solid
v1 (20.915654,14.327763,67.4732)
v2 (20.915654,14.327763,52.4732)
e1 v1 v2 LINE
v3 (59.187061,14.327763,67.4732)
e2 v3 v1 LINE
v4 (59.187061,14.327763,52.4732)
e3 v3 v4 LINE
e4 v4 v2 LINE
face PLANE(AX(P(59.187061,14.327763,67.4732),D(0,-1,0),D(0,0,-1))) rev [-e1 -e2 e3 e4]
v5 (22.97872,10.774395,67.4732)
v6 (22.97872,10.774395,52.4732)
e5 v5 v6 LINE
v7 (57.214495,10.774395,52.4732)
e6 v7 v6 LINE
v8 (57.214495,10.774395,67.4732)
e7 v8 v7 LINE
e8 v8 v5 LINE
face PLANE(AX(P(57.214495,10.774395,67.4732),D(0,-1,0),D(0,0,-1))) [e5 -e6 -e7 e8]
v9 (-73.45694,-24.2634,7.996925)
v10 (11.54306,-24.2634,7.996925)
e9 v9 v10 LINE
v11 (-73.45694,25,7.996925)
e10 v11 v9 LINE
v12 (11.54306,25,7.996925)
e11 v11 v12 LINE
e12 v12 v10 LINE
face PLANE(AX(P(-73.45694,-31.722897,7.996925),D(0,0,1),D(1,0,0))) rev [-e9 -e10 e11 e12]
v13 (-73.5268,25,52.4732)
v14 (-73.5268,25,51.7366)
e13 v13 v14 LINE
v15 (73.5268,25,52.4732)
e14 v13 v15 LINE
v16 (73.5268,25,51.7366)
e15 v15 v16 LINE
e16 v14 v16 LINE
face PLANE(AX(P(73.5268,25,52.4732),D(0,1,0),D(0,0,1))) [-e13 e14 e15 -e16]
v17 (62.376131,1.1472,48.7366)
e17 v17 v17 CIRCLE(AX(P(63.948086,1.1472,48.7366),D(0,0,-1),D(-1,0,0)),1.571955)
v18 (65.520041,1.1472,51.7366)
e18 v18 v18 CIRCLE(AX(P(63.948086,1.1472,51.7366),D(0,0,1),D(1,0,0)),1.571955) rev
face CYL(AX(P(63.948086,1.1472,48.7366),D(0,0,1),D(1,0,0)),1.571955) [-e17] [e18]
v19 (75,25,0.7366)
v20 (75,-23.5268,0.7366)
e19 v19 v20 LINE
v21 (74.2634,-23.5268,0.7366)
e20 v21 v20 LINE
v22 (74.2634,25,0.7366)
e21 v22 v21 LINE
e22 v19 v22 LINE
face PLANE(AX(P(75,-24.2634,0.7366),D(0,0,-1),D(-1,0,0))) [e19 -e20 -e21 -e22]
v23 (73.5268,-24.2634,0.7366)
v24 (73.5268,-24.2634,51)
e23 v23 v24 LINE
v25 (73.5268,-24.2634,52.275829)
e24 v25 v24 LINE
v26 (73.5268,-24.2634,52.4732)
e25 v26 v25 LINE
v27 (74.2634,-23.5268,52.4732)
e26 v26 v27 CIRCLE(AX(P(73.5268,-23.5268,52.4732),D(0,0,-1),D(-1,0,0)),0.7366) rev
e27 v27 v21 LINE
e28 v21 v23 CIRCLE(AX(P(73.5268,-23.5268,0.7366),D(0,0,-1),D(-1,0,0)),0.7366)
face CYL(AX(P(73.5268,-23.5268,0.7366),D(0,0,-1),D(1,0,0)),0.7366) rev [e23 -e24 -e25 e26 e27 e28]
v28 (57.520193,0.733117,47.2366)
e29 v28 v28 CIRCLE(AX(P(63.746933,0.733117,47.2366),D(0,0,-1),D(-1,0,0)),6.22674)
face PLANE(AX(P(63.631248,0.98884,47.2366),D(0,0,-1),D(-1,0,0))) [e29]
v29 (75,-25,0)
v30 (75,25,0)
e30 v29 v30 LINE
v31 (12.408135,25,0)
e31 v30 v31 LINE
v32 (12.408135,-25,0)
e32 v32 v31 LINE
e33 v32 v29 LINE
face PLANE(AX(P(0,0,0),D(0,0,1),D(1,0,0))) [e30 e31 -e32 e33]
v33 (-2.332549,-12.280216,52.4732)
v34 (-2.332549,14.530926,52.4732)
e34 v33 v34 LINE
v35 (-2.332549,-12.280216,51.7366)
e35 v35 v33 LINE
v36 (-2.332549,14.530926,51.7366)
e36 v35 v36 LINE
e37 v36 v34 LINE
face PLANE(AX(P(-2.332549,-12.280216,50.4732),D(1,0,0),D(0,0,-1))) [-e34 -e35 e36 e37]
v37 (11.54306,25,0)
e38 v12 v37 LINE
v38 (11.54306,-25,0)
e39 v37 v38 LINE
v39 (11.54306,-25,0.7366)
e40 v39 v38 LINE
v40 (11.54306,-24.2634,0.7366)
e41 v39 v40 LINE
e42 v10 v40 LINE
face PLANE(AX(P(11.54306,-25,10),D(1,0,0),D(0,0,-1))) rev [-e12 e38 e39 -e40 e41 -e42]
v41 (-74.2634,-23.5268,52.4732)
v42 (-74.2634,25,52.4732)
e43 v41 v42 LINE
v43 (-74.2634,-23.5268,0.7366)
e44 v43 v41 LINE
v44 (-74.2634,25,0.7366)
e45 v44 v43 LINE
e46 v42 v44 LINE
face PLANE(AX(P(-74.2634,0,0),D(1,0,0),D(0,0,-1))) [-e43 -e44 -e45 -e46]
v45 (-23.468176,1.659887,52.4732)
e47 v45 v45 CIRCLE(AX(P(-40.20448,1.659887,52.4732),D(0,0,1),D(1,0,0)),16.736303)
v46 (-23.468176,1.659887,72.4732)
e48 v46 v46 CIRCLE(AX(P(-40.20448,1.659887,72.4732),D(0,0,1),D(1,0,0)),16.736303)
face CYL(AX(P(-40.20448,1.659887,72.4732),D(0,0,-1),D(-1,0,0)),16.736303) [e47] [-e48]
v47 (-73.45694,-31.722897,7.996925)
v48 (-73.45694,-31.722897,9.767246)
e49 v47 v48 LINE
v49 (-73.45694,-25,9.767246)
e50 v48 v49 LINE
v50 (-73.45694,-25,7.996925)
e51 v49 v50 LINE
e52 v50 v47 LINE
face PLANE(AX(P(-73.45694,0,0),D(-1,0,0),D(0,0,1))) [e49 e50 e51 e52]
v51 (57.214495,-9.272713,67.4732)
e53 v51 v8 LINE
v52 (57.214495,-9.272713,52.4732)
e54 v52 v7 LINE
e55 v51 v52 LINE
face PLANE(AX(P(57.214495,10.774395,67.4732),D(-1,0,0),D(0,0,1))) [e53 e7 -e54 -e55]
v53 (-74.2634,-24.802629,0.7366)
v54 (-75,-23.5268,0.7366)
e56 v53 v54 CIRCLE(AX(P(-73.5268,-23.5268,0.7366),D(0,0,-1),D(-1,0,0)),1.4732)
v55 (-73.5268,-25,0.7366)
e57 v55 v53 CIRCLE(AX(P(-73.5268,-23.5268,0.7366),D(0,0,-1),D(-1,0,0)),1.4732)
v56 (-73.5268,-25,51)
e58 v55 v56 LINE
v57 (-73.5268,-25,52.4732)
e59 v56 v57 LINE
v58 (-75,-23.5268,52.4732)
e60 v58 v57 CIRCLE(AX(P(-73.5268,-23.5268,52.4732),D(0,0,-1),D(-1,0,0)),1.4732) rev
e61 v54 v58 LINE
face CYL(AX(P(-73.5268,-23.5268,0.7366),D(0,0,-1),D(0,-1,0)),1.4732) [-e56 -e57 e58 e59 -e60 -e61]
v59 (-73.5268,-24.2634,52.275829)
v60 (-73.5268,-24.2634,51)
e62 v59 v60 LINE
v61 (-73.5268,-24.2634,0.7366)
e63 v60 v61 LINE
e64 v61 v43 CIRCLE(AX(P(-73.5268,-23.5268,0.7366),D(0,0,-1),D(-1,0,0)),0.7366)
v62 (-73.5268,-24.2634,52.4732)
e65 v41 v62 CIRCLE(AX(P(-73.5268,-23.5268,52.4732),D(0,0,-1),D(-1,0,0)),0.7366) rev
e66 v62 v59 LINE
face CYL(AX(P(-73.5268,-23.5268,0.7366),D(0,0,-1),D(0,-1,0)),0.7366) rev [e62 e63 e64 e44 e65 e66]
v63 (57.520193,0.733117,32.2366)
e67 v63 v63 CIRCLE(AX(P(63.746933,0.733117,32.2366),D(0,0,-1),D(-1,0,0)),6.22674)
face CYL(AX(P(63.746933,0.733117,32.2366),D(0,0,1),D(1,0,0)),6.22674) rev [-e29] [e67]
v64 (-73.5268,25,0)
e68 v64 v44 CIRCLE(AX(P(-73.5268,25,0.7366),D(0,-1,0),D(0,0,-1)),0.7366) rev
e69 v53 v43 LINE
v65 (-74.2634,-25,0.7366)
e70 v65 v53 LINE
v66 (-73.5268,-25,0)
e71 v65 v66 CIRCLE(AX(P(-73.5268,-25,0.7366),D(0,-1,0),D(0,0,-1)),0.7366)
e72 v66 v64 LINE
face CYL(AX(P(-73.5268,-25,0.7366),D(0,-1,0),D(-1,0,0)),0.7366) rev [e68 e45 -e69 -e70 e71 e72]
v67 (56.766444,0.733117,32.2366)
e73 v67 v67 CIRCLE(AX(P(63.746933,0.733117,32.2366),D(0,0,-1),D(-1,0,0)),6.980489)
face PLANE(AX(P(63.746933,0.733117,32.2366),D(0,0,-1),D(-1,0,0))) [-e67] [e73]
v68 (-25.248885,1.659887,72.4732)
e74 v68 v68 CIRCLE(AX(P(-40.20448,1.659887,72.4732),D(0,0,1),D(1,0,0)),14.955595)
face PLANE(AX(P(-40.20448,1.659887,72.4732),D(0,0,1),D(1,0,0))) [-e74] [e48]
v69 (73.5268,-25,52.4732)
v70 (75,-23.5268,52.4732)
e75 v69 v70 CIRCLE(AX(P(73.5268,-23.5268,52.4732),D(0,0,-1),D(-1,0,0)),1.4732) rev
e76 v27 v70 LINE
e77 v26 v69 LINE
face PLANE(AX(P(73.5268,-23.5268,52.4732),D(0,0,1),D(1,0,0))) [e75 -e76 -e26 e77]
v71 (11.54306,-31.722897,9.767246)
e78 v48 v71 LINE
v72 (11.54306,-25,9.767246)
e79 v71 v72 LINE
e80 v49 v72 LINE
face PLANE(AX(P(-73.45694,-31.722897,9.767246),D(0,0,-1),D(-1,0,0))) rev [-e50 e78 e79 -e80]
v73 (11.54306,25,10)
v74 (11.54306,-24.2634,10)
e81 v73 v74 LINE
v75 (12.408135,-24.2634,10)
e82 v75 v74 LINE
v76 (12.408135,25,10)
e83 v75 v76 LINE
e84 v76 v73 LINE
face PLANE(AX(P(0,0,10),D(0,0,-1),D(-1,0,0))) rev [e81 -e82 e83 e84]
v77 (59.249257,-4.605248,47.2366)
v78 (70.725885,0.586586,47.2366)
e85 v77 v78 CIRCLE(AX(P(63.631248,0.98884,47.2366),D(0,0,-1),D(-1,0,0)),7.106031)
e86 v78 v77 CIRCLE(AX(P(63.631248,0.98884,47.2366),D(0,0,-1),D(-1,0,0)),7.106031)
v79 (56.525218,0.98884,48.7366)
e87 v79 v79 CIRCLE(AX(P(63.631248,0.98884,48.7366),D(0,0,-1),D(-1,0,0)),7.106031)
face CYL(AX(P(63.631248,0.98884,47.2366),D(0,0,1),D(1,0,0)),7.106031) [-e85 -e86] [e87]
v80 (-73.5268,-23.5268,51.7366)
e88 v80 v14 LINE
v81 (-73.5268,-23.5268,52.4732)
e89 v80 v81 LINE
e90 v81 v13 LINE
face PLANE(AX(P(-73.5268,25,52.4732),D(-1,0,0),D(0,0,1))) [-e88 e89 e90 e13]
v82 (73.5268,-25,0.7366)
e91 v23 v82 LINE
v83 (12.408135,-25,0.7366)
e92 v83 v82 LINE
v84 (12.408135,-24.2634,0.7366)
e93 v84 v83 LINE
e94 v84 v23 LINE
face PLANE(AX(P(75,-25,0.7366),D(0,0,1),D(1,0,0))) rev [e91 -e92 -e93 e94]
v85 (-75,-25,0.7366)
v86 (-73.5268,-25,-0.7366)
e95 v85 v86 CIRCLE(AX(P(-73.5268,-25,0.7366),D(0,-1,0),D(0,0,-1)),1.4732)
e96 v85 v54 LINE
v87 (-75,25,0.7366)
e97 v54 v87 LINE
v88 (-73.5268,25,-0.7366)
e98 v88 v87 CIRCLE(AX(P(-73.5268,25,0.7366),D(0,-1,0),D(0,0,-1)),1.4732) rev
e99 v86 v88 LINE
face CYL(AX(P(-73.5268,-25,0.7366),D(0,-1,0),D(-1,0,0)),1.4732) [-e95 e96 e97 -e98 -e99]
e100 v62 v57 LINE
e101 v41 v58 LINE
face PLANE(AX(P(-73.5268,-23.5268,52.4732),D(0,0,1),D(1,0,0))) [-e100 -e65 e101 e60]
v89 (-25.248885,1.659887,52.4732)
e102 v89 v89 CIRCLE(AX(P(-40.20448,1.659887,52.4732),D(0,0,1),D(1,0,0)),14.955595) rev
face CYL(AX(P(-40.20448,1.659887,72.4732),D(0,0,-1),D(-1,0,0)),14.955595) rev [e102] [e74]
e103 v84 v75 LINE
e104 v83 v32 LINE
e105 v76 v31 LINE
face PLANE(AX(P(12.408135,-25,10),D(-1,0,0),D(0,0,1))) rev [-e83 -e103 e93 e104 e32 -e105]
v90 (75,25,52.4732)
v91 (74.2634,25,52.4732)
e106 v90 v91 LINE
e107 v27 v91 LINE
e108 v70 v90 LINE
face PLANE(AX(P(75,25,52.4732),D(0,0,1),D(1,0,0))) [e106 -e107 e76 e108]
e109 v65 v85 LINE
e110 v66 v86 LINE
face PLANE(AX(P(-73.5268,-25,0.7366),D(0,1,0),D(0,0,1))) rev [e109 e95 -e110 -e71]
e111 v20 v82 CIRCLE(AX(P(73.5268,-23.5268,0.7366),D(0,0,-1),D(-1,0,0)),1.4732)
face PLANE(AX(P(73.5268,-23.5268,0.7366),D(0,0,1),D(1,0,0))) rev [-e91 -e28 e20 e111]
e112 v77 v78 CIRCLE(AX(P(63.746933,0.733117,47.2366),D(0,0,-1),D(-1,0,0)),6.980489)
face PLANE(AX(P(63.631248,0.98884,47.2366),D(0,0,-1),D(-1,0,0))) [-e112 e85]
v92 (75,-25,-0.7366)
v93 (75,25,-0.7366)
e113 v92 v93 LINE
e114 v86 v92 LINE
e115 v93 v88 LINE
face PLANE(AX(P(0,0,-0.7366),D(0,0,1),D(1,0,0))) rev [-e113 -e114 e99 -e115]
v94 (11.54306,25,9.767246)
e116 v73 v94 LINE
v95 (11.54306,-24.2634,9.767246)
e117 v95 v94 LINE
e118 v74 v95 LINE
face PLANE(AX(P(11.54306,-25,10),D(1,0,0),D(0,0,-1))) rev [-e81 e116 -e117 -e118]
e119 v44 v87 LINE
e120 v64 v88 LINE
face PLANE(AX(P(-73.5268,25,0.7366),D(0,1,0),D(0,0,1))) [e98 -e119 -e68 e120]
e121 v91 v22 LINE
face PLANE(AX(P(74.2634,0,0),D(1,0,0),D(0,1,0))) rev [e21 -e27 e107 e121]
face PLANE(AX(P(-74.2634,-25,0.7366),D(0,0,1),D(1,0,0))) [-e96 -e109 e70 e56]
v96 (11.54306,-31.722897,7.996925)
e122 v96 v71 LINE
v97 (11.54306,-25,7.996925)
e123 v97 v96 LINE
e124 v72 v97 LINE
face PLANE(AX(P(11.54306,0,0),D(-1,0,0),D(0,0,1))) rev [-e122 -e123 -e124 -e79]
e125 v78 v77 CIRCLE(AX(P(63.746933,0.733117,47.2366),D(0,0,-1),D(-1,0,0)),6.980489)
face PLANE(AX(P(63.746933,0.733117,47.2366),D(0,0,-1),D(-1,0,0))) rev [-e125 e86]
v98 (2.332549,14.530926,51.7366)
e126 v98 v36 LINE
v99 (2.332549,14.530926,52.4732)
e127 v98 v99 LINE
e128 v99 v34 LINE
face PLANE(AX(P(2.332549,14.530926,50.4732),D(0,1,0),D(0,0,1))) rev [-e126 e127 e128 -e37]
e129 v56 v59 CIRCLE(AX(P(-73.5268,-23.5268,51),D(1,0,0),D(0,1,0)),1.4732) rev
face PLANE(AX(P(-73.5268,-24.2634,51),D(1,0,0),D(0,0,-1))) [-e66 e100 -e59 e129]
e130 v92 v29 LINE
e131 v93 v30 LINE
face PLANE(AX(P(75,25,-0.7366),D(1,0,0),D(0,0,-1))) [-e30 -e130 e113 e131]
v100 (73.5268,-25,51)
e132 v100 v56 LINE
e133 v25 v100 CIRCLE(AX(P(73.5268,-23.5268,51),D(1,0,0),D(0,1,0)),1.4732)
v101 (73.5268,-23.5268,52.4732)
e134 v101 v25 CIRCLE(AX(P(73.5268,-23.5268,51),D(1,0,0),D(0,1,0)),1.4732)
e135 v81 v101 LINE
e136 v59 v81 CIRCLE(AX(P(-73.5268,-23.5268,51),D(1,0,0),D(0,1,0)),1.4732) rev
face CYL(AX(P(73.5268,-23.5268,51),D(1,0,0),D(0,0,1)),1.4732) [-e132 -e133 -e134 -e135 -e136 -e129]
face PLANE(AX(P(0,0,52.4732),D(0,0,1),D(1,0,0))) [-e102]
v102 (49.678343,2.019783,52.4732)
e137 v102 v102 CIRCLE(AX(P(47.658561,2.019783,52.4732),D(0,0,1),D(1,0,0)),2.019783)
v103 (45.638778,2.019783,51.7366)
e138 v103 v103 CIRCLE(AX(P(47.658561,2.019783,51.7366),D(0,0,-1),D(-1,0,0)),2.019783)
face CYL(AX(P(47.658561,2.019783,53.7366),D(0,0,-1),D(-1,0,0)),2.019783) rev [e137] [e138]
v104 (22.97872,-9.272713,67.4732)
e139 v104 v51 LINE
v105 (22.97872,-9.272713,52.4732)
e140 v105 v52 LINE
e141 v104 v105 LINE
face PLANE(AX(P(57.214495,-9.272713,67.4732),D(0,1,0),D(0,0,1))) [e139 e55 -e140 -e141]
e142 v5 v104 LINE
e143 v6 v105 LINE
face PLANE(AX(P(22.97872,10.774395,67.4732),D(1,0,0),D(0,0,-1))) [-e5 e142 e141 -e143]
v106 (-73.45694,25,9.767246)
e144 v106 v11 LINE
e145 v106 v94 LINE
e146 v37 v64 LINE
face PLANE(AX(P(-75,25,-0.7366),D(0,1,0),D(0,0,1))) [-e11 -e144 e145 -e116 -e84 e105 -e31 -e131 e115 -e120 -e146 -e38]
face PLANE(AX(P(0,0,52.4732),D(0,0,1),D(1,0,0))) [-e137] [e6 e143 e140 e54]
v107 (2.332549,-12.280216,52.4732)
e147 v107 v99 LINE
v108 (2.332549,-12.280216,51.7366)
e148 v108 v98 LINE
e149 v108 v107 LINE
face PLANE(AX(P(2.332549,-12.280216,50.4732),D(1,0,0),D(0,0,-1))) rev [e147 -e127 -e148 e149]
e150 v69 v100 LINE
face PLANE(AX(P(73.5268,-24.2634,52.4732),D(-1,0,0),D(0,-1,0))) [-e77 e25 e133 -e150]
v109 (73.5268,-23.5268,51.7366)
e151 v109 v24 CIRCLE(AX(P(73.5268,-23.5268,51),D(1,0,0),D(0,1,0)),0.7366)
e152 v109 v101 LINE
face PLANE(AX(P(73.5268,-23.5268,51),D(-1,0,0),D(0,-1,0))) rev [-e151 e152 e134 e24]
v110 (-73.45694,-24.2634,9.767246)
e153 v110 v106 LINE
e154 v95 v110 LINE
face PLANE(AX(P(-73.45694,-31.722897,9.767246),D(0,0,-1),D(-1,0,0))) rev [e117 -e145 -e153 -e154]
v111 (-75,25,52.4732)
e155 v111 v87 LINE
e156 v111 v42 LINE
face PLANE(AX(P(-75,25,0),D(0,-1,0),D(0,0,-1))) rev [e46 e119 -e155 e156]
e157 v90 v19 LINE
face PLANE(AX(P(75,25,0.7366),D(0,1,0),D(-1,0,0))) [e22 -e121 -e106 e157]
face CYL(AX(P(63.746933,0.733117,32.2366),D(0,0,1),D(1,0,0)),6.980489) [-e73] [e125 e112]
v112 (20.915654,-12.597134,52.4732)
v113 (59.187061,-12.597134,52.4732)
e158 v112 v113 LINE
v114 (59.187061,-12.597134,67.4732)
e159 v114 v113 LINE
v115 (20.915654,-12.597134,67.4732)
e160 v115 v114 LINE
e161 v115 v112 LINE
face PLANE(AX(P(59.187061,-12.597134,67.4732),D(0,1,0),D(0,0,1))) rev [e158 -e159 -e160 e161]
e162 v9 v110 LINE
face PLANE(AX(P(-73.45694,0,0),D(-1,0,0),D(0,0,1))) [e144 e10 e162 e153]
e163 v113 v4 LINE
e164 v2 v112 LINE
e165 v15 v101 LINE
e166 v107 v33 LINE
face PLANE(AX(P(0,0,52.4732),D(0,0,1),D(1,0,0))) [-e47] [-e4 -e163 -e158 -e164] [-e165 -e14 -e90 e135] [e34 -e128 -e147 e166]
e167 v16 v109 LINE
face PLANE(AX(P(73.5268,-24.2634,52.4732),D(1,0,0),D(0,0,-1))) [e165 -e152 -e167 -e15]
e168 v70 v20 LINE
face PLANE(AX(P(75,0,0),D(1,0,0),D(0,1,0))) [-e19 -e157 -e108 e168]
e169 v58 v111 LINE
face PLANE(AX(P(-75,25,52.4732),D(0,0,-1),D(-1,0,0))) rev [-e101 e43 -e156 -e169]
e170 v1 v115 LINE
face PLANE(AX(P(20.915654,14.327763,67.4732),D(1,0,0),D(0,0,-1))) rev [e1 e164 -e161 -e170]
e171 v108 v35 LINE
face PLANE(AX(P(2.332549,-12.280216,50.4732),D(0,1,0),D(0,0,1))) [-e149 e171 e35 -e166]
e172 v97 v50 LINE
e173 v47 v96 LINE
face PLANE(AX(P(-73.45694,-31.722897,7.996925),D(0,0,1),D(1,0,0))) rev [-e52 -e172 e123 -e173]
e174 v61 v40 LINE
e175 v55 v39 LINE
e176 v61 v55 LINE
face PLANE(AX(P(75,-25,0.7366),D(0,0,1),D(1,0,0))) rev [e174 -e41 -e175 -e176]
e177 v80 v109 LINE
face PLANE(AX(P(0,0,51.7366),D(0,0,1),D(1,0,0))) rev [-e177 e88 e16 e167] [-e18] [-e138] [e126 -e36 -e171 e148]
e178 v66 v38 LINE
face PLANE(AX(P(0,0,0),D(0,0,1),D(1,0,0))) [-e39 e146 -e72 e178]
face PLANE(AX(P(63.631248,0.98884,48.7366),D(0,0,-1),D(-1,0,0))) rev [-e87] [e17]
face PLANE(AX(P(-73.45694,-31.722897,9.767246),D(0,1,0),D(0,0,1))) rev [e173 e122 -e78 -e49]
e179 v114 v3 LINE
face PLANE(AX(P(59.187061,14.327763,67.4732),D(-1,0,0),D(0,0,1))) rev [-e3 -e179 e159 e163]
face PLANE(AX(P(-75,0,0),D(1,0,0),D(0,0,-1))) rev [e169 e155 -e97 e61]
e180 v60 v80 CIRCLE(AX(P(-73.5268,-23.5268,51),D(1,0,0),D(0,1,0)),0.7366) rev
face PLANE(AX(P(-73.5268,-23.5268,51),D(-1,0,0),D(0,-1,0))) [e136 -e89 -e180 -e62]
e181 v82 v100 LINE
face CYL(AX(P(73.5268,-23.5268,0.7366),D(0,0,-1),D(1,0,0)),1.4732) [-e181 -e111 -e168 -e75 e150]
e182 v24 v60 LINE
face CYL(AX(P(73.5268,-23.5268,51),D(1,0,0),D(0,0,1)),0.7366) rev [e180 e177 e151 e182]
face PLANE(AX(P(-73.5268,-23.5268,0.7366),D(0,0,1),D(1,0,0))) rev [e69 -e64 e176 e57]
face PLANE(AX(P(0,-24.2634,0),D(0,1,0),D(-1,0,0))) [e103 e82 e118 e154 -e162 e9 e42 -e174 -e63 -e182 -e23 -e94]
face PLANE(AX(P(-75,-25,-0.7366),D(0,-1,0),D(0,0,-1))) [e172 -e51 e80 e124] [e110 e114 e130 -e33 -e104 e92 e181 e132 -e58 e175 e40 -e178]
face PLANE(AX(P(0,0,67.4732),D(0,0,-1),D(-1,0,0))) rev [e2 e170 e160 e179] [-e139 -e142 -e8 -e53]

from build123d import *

# Parameters (mm, degrees)
SKETCH1_W                    = 150
SKETCH1_H                    = 50
BASE_FLANGE1_DEPTH           = 0.7366
EDGE_FLANGE2_STRIP_W         = 4.4196
EDGE_FLANGE2_STRIP_H         = 0.7366
EDGE_FLANGE2_STRIP_CUT_DEPTH = 50
EDGE_FLANGE2_DEPTH           = 50
EDGE_FLANGE3_STRIP_W         = 4.4196
EDGE_FLANGE3_STRIP_H         = 0.7366
EDGE_FLANGE3_STRIP_CUT_DEPTH = 51.7366
EDGE_FLANGE3_DEPTH           = 51.7366
EDGE_FLANGE5_STRIP_W         = 4.4196
EDGE_FLANGE5_STRIP_H         = 0.7366
EDGE_FLANGE5_STRIP_CUT_DEPTH = 51.7366
EDGE_FLANGE5_DEPTH           = 51.7366
EDGE_FLANGE6_STRIP_W         = 4.4196
EDGE_FLANGE6_STRIP_H         = 0.7366
EDGE_FLANGE6_STRIP_CUT_DEPTH = 147.0536
EDGE_FLANGE6_DEPTH           = 147.0536
SKETCH38_W                   = 4.66509895
SKETCH38_H                   = 26.811141958
CUT_EXTRUDE1_DEPTH           = 2
SKETCH40_R                   = 16.736303479
SKETCH40_R_2                 = 14.955594907
BOSS_EXTRUDE4_DEPTH          = 20
SKETCH42_W                   = 0.865074657
SKETCH42_H                   = 50
BOSS_EXTRUDE5_DEPTH          = 10
SKETCH57_W                   = 1.770321067
SKETCH57_H                   = 56.722896859
BOSS_EXTRUDE7_DEPTH          = 85
SKETCH60_W                   = 38.271407539
SKETCH60_H                   = 26.924897386
SKETCH60_W_2                 = 34.235775553
SKETCH60_H_2                 = 20.047107357
BOSS_EXTRUDE8_DEPTH          = 15
SKETCH61_R                   = 2.019782533
CUT_EXTRUDE3_DEPTH           = 2
SKETCH62_R                   = 1.571954748
BOSS_EXTRUDE9_DEPTH          = 3
SKETCH63_R                   = 7.10603058
BOSS_EXTRUDE10_DEPTH         = 1.5
SKETCH64_R                   = 6.980489156
SKETCH64_R_2                 = 6.226740222
BOSS_EXTRUDE11_DEPTH         = 15


# Sheet-metal steps are written as plain solids
with BuildPart() as part:
    # Sketch1 → Base-Flange1 (new body)
    with BuildSketch(Plane.XY):
        Rectangle(SKETCH1_W, SKETCH1_H)
    extrude(amount=-BASE_FLANGE1_DEPTH)

    # Edge-Flange2 strip (across the edge) → Edge-Flange2 strip cut (cut)
    with BuildSketch(Plane(origin=(-75, 25, 0), x_dir=(1, 0, 0), z_dir=(0, -1, 0))):
        with Locations((-0.7366, -0.3683)):
            Rectangle(EDGE_FLANGE2_STRIP_W, EDGE_FLANGE2_STRIP_H)
    extrude(amount=EDGE_FLANGE2_STRIP_CUT_DEPTH, mode=Mode.SUBTRACT)

    # Edge-Flange2 section (across the edge) → Edge-Flange2 (add)
    with BuildSketch(Plane(origin=(-75, 25, 0), x_dir=(1, 0, 0), z_dir=(0, -1, 0))):
        with BuildLine():
            Line((0, 0.7366), (0, 52.4732))
            Line((0, 52.4732), (0.7366, 52.4732))
            Line((0.7366, 52.4732), (0.7366, 0.7366))
            ThreePointArc((0.7366, 0.7366), (0.952345145, 0.215745145), (1.4732, 0))
            Line((1.4732, 0), (1.4732, -0.7366))
            ThreePointArc((1.4732, -0.7366), (0.43149029, -0.30510971), (0, 0.7366))
        make_face()
    extrude(amount=EDGE_FLANGE2_DEPTH)

    # Edge-Flange3 strip (across the edge) → Edge-Flange3 strip cut (cut)
    with BuildSketch(Plane(origin=(-74.2634, -25, 52.4732), x_dir=(0, 1, 0), z_dir=(0, 0, -1))):
        with Locations((-0.7366, -0.3683)):
            Rectangle(EDGE_FLANGE3_STRIP_W, EDGE_FLANGE3_STRIP_H)
    extrude(amount=EDGE_FLANGE3_STRIP_CUT_DEPTH, mode=Mode.SUBTRACT)

    # Edge-Flange3 section (across the edge) → Edge-Flange3 (add)
    with BuildSketch(Plane(origin=(-74.2634, -25, 52.4732), x_dir=(0, 1, 0), z_dir=(0, 0, -1))):
        with BuildLine():
            Line((0, 0.7366), (0, 149.2634))
            Line((0, 149.2634), (0.7366, 149.2634))
            Line((0.7366, 149.2634), (0.7366, 0.7366))
            ThreePointArc((0.7366, 0.7366), (0.952345145, 0.215745145), (1.4732, 0))
            Line((1.4732, 0), (1.4732, -0.7366))
            ThreePointArc((1.4732, -0.7366), (0.43149029, -0.30510971), (0, 0.7366))
        make_face()
    extrude(amount=EDGE_FLANGE3_DEPTH)

    # Edge-Flange5 strip (across the edge) → Edge-Flange5 strip cut (cut)
    with BuildSketch(Plane(origin=(75, -24.2634, 52.4732), x_dir=(-1, 0, 0), z_dir=(0, 0, -1))):
        with Locations((-0.7366, -0.3683)):
            Rectangle(EDGE_FLANGE5_STRIP_W, EDGE_FLANGE5_STRIP_H)
    extrude(amount=EDGE_FLANGE5_STRIP_CUT_DEPTH, mode=Mode.SUBTRACT)

    # Edge-Flange5 section (across the edge) → Edge-Flange5 (add)
    with BuildSketch(Plane(origin=(75, -24.2634, 52.4732), x_dir=(-1, 0, 0), z_dir=(0, 0, -1))):
        with BuildLine():
            Line((0, 0.7366), (0, 49.2634))
            Line((0, 49.2634), (0.7366, 49.2634))
            Line((0.7366, 49.2634), (0.7366, 0.7366))
            ThreePointArc((0.7366, 0.7366), (0.952345145, 0.215745145), (1.4732, 0))
            Line((1.4732, 0), (1.4732, -0.7366))
            ThreePointArc((1.4732, -0.7366), (0.43149029, -0.30510971), (0, 0.7366))
        make_face()
    extrude(amount=EDGE_FLANGE5_DEPTH)

    # Edge-Flange6 strip (across the edge) → Edge-Flange6 strip cut (cut)
    with BuildSketch(Plane(origin=(-73.5268, -24.2634, 52.4732), x_dir=(0, 0, -1), z_dir=(1, 0, 0))):
        with Locations((-0.7366, -0.3683)):
            Rectangle(EDGE_FLANGE6_STRIP_W, EDGE_FLANGE6_STRIP_H)
    extrude(amount=EDGE_FLANGE6_STRIP_CUT_DEPTH, mode=Mode.SUBTRACT)

    # Edge-Flange6 section (across the edge) → Edge-Flange6 (add)
    with BuildSketch(Plane(origin=(-73.5268, -24.2634, 52.4732), x_dir=(0, 0, -1), z_dir=(1, 0, 0))):
        with BuildLine():
            Line((0, 0.7366), (0, 49.2634))
            Line((0, 49.2634), (0.7366, 49.2634))
            Line((0.7366, 49.2634), (0.7366, 0.7366))
            ThreePointArc((0.7366, 0.7366), (0.952345145, 0.215745145), (1.4732, 0))
            Line((1.4732, 0), (1.4732, -0.7366))
            ThreePointArc((1.4732, -0.7366), (0.43149029, -0.30510971), (0, 0.7366))
        make_face()
    extrude(amount=EDGE_FLANGE6_DEPTH)

    # Sketch38 → Cut-Extrude1 (cut)
    with BuildSketch(Plane.XY.offset(52.4732)):
        with Locations((0, 1.125354672)):
            Rectangle(SKETCH38_W, SKETCH38_H)
    extrude(amount=-CUT_EXTRUDE1_DEPTH, mode=Mode.SUBTRACT)

    # Sketch40 → Boss-Extrude4 (add)
    with BuildSketch(Plane.XY.offset(52.4732)):
        with Locations((-40.204479975, 1.659887055)):
            Circle(SKETCH40_R)
        with Locations((-40.204479975, 1.659887055)):
            Circle(SKETCH40_R_2, mode=Mode.SUBTRACT)
    extrude(amount=BOSS_EXTRUDE4_DEPTH)

    # Sketch42 → Boss-Extrude5 (add)
    with BuildSketch(Plane.XY):
        with Locations((11.975597677, 0)):
            Rectangle(SKETCH42_W, SKETCH42_H)
    extrude(amount=BOSS_EXTRUDE5_DEPTH)

    # Sketch57 → Boss-Extrude7 (add)
    with BuildSketch(Plane.ZY.offset(-11.543060348)):
        with Locations((8.882085538, -3.36144843)):
            Rectangle(SKETCH57_W, SKETCH57_H)
    extrude(amount=BOSS_EXTRUDE7_DEPTH)

    # Sketch60 → Boss-Extrude8 (add)
    with BuildSketch(Plane.XY.offset(52.4732)):
        with Locations((40.051357612, 0.865314599)):
            Rectangle(SKETCH60_W, SKETCH60_H)
        with Locations((40.096607613, 0.750841138)):
            Rectangle(SKETCH60_W_2, SKETCH60_H_2, mode=Mode.SUBTRACT)
    extrude(amount=BOSS_EXTRUDE8_DEPTH)

    # Sketch61 → Cut-Extrude3 (cut)
    with BuildSketch(Plane(origin=(0, 0, 51.7366), x_dir=(-1, 0, 0), z_dir=(0, 0, -1))):
        with Locations((-47.658560575, 2.019782533)):
            Circle(SKETCH61_R)
    extrude(amount=-CUT_EXTRUDE3_DEPTH, mode=Mode.SUBTRACT)

    # Sketch62 → Boss-Extrude9 (add)
    with BuildSketch(Plane(origin=(0, 0, 51.7366), x_dir=(-1, 0, 0), z_dir=(0, 0, -1))):
        with Locations(Location((-63.948086172, 1.147200329, 0), (0, 0, 180))):
            Circle(SKETCH62_R)
    extrude(amount=BOSS_EXTRUDE9_DEPTH)

    # Sketch63 → Boss-Extrude10 (add)
    with BuildSketch(Plane(origin=(0, 0, 48.7366), x_dir=(-1, 0, 0), z_dir=(0, 0, -1))):
        with Locations((-63.631248371, 0.988840217)):
            Circle(SKETCH63_R)
    extrude(amount=BOSS_EXTRUDE10_DEPTH)

    # Sketch64 → Boss-Extrude11 (add)
    with BuildSketch(Plane(origin=(0, 0, 47.2366), x_dir=(-1, 0, 0), z_dir=(0, 0, -1))):
        with Locations(Location((-63.746933468, 0.733116553, 0), (0, 0, 181.202812621))):
            Circle(SKETCH64_R)
        with Locations((-63.746933468, 0.733116553)):
            Circle(SKETCH64_R_2, mode=Mode.SUBTRACT)
    extrude(amount=BOSS_EXTRUDE11_DEPTH)


solid = part.part
